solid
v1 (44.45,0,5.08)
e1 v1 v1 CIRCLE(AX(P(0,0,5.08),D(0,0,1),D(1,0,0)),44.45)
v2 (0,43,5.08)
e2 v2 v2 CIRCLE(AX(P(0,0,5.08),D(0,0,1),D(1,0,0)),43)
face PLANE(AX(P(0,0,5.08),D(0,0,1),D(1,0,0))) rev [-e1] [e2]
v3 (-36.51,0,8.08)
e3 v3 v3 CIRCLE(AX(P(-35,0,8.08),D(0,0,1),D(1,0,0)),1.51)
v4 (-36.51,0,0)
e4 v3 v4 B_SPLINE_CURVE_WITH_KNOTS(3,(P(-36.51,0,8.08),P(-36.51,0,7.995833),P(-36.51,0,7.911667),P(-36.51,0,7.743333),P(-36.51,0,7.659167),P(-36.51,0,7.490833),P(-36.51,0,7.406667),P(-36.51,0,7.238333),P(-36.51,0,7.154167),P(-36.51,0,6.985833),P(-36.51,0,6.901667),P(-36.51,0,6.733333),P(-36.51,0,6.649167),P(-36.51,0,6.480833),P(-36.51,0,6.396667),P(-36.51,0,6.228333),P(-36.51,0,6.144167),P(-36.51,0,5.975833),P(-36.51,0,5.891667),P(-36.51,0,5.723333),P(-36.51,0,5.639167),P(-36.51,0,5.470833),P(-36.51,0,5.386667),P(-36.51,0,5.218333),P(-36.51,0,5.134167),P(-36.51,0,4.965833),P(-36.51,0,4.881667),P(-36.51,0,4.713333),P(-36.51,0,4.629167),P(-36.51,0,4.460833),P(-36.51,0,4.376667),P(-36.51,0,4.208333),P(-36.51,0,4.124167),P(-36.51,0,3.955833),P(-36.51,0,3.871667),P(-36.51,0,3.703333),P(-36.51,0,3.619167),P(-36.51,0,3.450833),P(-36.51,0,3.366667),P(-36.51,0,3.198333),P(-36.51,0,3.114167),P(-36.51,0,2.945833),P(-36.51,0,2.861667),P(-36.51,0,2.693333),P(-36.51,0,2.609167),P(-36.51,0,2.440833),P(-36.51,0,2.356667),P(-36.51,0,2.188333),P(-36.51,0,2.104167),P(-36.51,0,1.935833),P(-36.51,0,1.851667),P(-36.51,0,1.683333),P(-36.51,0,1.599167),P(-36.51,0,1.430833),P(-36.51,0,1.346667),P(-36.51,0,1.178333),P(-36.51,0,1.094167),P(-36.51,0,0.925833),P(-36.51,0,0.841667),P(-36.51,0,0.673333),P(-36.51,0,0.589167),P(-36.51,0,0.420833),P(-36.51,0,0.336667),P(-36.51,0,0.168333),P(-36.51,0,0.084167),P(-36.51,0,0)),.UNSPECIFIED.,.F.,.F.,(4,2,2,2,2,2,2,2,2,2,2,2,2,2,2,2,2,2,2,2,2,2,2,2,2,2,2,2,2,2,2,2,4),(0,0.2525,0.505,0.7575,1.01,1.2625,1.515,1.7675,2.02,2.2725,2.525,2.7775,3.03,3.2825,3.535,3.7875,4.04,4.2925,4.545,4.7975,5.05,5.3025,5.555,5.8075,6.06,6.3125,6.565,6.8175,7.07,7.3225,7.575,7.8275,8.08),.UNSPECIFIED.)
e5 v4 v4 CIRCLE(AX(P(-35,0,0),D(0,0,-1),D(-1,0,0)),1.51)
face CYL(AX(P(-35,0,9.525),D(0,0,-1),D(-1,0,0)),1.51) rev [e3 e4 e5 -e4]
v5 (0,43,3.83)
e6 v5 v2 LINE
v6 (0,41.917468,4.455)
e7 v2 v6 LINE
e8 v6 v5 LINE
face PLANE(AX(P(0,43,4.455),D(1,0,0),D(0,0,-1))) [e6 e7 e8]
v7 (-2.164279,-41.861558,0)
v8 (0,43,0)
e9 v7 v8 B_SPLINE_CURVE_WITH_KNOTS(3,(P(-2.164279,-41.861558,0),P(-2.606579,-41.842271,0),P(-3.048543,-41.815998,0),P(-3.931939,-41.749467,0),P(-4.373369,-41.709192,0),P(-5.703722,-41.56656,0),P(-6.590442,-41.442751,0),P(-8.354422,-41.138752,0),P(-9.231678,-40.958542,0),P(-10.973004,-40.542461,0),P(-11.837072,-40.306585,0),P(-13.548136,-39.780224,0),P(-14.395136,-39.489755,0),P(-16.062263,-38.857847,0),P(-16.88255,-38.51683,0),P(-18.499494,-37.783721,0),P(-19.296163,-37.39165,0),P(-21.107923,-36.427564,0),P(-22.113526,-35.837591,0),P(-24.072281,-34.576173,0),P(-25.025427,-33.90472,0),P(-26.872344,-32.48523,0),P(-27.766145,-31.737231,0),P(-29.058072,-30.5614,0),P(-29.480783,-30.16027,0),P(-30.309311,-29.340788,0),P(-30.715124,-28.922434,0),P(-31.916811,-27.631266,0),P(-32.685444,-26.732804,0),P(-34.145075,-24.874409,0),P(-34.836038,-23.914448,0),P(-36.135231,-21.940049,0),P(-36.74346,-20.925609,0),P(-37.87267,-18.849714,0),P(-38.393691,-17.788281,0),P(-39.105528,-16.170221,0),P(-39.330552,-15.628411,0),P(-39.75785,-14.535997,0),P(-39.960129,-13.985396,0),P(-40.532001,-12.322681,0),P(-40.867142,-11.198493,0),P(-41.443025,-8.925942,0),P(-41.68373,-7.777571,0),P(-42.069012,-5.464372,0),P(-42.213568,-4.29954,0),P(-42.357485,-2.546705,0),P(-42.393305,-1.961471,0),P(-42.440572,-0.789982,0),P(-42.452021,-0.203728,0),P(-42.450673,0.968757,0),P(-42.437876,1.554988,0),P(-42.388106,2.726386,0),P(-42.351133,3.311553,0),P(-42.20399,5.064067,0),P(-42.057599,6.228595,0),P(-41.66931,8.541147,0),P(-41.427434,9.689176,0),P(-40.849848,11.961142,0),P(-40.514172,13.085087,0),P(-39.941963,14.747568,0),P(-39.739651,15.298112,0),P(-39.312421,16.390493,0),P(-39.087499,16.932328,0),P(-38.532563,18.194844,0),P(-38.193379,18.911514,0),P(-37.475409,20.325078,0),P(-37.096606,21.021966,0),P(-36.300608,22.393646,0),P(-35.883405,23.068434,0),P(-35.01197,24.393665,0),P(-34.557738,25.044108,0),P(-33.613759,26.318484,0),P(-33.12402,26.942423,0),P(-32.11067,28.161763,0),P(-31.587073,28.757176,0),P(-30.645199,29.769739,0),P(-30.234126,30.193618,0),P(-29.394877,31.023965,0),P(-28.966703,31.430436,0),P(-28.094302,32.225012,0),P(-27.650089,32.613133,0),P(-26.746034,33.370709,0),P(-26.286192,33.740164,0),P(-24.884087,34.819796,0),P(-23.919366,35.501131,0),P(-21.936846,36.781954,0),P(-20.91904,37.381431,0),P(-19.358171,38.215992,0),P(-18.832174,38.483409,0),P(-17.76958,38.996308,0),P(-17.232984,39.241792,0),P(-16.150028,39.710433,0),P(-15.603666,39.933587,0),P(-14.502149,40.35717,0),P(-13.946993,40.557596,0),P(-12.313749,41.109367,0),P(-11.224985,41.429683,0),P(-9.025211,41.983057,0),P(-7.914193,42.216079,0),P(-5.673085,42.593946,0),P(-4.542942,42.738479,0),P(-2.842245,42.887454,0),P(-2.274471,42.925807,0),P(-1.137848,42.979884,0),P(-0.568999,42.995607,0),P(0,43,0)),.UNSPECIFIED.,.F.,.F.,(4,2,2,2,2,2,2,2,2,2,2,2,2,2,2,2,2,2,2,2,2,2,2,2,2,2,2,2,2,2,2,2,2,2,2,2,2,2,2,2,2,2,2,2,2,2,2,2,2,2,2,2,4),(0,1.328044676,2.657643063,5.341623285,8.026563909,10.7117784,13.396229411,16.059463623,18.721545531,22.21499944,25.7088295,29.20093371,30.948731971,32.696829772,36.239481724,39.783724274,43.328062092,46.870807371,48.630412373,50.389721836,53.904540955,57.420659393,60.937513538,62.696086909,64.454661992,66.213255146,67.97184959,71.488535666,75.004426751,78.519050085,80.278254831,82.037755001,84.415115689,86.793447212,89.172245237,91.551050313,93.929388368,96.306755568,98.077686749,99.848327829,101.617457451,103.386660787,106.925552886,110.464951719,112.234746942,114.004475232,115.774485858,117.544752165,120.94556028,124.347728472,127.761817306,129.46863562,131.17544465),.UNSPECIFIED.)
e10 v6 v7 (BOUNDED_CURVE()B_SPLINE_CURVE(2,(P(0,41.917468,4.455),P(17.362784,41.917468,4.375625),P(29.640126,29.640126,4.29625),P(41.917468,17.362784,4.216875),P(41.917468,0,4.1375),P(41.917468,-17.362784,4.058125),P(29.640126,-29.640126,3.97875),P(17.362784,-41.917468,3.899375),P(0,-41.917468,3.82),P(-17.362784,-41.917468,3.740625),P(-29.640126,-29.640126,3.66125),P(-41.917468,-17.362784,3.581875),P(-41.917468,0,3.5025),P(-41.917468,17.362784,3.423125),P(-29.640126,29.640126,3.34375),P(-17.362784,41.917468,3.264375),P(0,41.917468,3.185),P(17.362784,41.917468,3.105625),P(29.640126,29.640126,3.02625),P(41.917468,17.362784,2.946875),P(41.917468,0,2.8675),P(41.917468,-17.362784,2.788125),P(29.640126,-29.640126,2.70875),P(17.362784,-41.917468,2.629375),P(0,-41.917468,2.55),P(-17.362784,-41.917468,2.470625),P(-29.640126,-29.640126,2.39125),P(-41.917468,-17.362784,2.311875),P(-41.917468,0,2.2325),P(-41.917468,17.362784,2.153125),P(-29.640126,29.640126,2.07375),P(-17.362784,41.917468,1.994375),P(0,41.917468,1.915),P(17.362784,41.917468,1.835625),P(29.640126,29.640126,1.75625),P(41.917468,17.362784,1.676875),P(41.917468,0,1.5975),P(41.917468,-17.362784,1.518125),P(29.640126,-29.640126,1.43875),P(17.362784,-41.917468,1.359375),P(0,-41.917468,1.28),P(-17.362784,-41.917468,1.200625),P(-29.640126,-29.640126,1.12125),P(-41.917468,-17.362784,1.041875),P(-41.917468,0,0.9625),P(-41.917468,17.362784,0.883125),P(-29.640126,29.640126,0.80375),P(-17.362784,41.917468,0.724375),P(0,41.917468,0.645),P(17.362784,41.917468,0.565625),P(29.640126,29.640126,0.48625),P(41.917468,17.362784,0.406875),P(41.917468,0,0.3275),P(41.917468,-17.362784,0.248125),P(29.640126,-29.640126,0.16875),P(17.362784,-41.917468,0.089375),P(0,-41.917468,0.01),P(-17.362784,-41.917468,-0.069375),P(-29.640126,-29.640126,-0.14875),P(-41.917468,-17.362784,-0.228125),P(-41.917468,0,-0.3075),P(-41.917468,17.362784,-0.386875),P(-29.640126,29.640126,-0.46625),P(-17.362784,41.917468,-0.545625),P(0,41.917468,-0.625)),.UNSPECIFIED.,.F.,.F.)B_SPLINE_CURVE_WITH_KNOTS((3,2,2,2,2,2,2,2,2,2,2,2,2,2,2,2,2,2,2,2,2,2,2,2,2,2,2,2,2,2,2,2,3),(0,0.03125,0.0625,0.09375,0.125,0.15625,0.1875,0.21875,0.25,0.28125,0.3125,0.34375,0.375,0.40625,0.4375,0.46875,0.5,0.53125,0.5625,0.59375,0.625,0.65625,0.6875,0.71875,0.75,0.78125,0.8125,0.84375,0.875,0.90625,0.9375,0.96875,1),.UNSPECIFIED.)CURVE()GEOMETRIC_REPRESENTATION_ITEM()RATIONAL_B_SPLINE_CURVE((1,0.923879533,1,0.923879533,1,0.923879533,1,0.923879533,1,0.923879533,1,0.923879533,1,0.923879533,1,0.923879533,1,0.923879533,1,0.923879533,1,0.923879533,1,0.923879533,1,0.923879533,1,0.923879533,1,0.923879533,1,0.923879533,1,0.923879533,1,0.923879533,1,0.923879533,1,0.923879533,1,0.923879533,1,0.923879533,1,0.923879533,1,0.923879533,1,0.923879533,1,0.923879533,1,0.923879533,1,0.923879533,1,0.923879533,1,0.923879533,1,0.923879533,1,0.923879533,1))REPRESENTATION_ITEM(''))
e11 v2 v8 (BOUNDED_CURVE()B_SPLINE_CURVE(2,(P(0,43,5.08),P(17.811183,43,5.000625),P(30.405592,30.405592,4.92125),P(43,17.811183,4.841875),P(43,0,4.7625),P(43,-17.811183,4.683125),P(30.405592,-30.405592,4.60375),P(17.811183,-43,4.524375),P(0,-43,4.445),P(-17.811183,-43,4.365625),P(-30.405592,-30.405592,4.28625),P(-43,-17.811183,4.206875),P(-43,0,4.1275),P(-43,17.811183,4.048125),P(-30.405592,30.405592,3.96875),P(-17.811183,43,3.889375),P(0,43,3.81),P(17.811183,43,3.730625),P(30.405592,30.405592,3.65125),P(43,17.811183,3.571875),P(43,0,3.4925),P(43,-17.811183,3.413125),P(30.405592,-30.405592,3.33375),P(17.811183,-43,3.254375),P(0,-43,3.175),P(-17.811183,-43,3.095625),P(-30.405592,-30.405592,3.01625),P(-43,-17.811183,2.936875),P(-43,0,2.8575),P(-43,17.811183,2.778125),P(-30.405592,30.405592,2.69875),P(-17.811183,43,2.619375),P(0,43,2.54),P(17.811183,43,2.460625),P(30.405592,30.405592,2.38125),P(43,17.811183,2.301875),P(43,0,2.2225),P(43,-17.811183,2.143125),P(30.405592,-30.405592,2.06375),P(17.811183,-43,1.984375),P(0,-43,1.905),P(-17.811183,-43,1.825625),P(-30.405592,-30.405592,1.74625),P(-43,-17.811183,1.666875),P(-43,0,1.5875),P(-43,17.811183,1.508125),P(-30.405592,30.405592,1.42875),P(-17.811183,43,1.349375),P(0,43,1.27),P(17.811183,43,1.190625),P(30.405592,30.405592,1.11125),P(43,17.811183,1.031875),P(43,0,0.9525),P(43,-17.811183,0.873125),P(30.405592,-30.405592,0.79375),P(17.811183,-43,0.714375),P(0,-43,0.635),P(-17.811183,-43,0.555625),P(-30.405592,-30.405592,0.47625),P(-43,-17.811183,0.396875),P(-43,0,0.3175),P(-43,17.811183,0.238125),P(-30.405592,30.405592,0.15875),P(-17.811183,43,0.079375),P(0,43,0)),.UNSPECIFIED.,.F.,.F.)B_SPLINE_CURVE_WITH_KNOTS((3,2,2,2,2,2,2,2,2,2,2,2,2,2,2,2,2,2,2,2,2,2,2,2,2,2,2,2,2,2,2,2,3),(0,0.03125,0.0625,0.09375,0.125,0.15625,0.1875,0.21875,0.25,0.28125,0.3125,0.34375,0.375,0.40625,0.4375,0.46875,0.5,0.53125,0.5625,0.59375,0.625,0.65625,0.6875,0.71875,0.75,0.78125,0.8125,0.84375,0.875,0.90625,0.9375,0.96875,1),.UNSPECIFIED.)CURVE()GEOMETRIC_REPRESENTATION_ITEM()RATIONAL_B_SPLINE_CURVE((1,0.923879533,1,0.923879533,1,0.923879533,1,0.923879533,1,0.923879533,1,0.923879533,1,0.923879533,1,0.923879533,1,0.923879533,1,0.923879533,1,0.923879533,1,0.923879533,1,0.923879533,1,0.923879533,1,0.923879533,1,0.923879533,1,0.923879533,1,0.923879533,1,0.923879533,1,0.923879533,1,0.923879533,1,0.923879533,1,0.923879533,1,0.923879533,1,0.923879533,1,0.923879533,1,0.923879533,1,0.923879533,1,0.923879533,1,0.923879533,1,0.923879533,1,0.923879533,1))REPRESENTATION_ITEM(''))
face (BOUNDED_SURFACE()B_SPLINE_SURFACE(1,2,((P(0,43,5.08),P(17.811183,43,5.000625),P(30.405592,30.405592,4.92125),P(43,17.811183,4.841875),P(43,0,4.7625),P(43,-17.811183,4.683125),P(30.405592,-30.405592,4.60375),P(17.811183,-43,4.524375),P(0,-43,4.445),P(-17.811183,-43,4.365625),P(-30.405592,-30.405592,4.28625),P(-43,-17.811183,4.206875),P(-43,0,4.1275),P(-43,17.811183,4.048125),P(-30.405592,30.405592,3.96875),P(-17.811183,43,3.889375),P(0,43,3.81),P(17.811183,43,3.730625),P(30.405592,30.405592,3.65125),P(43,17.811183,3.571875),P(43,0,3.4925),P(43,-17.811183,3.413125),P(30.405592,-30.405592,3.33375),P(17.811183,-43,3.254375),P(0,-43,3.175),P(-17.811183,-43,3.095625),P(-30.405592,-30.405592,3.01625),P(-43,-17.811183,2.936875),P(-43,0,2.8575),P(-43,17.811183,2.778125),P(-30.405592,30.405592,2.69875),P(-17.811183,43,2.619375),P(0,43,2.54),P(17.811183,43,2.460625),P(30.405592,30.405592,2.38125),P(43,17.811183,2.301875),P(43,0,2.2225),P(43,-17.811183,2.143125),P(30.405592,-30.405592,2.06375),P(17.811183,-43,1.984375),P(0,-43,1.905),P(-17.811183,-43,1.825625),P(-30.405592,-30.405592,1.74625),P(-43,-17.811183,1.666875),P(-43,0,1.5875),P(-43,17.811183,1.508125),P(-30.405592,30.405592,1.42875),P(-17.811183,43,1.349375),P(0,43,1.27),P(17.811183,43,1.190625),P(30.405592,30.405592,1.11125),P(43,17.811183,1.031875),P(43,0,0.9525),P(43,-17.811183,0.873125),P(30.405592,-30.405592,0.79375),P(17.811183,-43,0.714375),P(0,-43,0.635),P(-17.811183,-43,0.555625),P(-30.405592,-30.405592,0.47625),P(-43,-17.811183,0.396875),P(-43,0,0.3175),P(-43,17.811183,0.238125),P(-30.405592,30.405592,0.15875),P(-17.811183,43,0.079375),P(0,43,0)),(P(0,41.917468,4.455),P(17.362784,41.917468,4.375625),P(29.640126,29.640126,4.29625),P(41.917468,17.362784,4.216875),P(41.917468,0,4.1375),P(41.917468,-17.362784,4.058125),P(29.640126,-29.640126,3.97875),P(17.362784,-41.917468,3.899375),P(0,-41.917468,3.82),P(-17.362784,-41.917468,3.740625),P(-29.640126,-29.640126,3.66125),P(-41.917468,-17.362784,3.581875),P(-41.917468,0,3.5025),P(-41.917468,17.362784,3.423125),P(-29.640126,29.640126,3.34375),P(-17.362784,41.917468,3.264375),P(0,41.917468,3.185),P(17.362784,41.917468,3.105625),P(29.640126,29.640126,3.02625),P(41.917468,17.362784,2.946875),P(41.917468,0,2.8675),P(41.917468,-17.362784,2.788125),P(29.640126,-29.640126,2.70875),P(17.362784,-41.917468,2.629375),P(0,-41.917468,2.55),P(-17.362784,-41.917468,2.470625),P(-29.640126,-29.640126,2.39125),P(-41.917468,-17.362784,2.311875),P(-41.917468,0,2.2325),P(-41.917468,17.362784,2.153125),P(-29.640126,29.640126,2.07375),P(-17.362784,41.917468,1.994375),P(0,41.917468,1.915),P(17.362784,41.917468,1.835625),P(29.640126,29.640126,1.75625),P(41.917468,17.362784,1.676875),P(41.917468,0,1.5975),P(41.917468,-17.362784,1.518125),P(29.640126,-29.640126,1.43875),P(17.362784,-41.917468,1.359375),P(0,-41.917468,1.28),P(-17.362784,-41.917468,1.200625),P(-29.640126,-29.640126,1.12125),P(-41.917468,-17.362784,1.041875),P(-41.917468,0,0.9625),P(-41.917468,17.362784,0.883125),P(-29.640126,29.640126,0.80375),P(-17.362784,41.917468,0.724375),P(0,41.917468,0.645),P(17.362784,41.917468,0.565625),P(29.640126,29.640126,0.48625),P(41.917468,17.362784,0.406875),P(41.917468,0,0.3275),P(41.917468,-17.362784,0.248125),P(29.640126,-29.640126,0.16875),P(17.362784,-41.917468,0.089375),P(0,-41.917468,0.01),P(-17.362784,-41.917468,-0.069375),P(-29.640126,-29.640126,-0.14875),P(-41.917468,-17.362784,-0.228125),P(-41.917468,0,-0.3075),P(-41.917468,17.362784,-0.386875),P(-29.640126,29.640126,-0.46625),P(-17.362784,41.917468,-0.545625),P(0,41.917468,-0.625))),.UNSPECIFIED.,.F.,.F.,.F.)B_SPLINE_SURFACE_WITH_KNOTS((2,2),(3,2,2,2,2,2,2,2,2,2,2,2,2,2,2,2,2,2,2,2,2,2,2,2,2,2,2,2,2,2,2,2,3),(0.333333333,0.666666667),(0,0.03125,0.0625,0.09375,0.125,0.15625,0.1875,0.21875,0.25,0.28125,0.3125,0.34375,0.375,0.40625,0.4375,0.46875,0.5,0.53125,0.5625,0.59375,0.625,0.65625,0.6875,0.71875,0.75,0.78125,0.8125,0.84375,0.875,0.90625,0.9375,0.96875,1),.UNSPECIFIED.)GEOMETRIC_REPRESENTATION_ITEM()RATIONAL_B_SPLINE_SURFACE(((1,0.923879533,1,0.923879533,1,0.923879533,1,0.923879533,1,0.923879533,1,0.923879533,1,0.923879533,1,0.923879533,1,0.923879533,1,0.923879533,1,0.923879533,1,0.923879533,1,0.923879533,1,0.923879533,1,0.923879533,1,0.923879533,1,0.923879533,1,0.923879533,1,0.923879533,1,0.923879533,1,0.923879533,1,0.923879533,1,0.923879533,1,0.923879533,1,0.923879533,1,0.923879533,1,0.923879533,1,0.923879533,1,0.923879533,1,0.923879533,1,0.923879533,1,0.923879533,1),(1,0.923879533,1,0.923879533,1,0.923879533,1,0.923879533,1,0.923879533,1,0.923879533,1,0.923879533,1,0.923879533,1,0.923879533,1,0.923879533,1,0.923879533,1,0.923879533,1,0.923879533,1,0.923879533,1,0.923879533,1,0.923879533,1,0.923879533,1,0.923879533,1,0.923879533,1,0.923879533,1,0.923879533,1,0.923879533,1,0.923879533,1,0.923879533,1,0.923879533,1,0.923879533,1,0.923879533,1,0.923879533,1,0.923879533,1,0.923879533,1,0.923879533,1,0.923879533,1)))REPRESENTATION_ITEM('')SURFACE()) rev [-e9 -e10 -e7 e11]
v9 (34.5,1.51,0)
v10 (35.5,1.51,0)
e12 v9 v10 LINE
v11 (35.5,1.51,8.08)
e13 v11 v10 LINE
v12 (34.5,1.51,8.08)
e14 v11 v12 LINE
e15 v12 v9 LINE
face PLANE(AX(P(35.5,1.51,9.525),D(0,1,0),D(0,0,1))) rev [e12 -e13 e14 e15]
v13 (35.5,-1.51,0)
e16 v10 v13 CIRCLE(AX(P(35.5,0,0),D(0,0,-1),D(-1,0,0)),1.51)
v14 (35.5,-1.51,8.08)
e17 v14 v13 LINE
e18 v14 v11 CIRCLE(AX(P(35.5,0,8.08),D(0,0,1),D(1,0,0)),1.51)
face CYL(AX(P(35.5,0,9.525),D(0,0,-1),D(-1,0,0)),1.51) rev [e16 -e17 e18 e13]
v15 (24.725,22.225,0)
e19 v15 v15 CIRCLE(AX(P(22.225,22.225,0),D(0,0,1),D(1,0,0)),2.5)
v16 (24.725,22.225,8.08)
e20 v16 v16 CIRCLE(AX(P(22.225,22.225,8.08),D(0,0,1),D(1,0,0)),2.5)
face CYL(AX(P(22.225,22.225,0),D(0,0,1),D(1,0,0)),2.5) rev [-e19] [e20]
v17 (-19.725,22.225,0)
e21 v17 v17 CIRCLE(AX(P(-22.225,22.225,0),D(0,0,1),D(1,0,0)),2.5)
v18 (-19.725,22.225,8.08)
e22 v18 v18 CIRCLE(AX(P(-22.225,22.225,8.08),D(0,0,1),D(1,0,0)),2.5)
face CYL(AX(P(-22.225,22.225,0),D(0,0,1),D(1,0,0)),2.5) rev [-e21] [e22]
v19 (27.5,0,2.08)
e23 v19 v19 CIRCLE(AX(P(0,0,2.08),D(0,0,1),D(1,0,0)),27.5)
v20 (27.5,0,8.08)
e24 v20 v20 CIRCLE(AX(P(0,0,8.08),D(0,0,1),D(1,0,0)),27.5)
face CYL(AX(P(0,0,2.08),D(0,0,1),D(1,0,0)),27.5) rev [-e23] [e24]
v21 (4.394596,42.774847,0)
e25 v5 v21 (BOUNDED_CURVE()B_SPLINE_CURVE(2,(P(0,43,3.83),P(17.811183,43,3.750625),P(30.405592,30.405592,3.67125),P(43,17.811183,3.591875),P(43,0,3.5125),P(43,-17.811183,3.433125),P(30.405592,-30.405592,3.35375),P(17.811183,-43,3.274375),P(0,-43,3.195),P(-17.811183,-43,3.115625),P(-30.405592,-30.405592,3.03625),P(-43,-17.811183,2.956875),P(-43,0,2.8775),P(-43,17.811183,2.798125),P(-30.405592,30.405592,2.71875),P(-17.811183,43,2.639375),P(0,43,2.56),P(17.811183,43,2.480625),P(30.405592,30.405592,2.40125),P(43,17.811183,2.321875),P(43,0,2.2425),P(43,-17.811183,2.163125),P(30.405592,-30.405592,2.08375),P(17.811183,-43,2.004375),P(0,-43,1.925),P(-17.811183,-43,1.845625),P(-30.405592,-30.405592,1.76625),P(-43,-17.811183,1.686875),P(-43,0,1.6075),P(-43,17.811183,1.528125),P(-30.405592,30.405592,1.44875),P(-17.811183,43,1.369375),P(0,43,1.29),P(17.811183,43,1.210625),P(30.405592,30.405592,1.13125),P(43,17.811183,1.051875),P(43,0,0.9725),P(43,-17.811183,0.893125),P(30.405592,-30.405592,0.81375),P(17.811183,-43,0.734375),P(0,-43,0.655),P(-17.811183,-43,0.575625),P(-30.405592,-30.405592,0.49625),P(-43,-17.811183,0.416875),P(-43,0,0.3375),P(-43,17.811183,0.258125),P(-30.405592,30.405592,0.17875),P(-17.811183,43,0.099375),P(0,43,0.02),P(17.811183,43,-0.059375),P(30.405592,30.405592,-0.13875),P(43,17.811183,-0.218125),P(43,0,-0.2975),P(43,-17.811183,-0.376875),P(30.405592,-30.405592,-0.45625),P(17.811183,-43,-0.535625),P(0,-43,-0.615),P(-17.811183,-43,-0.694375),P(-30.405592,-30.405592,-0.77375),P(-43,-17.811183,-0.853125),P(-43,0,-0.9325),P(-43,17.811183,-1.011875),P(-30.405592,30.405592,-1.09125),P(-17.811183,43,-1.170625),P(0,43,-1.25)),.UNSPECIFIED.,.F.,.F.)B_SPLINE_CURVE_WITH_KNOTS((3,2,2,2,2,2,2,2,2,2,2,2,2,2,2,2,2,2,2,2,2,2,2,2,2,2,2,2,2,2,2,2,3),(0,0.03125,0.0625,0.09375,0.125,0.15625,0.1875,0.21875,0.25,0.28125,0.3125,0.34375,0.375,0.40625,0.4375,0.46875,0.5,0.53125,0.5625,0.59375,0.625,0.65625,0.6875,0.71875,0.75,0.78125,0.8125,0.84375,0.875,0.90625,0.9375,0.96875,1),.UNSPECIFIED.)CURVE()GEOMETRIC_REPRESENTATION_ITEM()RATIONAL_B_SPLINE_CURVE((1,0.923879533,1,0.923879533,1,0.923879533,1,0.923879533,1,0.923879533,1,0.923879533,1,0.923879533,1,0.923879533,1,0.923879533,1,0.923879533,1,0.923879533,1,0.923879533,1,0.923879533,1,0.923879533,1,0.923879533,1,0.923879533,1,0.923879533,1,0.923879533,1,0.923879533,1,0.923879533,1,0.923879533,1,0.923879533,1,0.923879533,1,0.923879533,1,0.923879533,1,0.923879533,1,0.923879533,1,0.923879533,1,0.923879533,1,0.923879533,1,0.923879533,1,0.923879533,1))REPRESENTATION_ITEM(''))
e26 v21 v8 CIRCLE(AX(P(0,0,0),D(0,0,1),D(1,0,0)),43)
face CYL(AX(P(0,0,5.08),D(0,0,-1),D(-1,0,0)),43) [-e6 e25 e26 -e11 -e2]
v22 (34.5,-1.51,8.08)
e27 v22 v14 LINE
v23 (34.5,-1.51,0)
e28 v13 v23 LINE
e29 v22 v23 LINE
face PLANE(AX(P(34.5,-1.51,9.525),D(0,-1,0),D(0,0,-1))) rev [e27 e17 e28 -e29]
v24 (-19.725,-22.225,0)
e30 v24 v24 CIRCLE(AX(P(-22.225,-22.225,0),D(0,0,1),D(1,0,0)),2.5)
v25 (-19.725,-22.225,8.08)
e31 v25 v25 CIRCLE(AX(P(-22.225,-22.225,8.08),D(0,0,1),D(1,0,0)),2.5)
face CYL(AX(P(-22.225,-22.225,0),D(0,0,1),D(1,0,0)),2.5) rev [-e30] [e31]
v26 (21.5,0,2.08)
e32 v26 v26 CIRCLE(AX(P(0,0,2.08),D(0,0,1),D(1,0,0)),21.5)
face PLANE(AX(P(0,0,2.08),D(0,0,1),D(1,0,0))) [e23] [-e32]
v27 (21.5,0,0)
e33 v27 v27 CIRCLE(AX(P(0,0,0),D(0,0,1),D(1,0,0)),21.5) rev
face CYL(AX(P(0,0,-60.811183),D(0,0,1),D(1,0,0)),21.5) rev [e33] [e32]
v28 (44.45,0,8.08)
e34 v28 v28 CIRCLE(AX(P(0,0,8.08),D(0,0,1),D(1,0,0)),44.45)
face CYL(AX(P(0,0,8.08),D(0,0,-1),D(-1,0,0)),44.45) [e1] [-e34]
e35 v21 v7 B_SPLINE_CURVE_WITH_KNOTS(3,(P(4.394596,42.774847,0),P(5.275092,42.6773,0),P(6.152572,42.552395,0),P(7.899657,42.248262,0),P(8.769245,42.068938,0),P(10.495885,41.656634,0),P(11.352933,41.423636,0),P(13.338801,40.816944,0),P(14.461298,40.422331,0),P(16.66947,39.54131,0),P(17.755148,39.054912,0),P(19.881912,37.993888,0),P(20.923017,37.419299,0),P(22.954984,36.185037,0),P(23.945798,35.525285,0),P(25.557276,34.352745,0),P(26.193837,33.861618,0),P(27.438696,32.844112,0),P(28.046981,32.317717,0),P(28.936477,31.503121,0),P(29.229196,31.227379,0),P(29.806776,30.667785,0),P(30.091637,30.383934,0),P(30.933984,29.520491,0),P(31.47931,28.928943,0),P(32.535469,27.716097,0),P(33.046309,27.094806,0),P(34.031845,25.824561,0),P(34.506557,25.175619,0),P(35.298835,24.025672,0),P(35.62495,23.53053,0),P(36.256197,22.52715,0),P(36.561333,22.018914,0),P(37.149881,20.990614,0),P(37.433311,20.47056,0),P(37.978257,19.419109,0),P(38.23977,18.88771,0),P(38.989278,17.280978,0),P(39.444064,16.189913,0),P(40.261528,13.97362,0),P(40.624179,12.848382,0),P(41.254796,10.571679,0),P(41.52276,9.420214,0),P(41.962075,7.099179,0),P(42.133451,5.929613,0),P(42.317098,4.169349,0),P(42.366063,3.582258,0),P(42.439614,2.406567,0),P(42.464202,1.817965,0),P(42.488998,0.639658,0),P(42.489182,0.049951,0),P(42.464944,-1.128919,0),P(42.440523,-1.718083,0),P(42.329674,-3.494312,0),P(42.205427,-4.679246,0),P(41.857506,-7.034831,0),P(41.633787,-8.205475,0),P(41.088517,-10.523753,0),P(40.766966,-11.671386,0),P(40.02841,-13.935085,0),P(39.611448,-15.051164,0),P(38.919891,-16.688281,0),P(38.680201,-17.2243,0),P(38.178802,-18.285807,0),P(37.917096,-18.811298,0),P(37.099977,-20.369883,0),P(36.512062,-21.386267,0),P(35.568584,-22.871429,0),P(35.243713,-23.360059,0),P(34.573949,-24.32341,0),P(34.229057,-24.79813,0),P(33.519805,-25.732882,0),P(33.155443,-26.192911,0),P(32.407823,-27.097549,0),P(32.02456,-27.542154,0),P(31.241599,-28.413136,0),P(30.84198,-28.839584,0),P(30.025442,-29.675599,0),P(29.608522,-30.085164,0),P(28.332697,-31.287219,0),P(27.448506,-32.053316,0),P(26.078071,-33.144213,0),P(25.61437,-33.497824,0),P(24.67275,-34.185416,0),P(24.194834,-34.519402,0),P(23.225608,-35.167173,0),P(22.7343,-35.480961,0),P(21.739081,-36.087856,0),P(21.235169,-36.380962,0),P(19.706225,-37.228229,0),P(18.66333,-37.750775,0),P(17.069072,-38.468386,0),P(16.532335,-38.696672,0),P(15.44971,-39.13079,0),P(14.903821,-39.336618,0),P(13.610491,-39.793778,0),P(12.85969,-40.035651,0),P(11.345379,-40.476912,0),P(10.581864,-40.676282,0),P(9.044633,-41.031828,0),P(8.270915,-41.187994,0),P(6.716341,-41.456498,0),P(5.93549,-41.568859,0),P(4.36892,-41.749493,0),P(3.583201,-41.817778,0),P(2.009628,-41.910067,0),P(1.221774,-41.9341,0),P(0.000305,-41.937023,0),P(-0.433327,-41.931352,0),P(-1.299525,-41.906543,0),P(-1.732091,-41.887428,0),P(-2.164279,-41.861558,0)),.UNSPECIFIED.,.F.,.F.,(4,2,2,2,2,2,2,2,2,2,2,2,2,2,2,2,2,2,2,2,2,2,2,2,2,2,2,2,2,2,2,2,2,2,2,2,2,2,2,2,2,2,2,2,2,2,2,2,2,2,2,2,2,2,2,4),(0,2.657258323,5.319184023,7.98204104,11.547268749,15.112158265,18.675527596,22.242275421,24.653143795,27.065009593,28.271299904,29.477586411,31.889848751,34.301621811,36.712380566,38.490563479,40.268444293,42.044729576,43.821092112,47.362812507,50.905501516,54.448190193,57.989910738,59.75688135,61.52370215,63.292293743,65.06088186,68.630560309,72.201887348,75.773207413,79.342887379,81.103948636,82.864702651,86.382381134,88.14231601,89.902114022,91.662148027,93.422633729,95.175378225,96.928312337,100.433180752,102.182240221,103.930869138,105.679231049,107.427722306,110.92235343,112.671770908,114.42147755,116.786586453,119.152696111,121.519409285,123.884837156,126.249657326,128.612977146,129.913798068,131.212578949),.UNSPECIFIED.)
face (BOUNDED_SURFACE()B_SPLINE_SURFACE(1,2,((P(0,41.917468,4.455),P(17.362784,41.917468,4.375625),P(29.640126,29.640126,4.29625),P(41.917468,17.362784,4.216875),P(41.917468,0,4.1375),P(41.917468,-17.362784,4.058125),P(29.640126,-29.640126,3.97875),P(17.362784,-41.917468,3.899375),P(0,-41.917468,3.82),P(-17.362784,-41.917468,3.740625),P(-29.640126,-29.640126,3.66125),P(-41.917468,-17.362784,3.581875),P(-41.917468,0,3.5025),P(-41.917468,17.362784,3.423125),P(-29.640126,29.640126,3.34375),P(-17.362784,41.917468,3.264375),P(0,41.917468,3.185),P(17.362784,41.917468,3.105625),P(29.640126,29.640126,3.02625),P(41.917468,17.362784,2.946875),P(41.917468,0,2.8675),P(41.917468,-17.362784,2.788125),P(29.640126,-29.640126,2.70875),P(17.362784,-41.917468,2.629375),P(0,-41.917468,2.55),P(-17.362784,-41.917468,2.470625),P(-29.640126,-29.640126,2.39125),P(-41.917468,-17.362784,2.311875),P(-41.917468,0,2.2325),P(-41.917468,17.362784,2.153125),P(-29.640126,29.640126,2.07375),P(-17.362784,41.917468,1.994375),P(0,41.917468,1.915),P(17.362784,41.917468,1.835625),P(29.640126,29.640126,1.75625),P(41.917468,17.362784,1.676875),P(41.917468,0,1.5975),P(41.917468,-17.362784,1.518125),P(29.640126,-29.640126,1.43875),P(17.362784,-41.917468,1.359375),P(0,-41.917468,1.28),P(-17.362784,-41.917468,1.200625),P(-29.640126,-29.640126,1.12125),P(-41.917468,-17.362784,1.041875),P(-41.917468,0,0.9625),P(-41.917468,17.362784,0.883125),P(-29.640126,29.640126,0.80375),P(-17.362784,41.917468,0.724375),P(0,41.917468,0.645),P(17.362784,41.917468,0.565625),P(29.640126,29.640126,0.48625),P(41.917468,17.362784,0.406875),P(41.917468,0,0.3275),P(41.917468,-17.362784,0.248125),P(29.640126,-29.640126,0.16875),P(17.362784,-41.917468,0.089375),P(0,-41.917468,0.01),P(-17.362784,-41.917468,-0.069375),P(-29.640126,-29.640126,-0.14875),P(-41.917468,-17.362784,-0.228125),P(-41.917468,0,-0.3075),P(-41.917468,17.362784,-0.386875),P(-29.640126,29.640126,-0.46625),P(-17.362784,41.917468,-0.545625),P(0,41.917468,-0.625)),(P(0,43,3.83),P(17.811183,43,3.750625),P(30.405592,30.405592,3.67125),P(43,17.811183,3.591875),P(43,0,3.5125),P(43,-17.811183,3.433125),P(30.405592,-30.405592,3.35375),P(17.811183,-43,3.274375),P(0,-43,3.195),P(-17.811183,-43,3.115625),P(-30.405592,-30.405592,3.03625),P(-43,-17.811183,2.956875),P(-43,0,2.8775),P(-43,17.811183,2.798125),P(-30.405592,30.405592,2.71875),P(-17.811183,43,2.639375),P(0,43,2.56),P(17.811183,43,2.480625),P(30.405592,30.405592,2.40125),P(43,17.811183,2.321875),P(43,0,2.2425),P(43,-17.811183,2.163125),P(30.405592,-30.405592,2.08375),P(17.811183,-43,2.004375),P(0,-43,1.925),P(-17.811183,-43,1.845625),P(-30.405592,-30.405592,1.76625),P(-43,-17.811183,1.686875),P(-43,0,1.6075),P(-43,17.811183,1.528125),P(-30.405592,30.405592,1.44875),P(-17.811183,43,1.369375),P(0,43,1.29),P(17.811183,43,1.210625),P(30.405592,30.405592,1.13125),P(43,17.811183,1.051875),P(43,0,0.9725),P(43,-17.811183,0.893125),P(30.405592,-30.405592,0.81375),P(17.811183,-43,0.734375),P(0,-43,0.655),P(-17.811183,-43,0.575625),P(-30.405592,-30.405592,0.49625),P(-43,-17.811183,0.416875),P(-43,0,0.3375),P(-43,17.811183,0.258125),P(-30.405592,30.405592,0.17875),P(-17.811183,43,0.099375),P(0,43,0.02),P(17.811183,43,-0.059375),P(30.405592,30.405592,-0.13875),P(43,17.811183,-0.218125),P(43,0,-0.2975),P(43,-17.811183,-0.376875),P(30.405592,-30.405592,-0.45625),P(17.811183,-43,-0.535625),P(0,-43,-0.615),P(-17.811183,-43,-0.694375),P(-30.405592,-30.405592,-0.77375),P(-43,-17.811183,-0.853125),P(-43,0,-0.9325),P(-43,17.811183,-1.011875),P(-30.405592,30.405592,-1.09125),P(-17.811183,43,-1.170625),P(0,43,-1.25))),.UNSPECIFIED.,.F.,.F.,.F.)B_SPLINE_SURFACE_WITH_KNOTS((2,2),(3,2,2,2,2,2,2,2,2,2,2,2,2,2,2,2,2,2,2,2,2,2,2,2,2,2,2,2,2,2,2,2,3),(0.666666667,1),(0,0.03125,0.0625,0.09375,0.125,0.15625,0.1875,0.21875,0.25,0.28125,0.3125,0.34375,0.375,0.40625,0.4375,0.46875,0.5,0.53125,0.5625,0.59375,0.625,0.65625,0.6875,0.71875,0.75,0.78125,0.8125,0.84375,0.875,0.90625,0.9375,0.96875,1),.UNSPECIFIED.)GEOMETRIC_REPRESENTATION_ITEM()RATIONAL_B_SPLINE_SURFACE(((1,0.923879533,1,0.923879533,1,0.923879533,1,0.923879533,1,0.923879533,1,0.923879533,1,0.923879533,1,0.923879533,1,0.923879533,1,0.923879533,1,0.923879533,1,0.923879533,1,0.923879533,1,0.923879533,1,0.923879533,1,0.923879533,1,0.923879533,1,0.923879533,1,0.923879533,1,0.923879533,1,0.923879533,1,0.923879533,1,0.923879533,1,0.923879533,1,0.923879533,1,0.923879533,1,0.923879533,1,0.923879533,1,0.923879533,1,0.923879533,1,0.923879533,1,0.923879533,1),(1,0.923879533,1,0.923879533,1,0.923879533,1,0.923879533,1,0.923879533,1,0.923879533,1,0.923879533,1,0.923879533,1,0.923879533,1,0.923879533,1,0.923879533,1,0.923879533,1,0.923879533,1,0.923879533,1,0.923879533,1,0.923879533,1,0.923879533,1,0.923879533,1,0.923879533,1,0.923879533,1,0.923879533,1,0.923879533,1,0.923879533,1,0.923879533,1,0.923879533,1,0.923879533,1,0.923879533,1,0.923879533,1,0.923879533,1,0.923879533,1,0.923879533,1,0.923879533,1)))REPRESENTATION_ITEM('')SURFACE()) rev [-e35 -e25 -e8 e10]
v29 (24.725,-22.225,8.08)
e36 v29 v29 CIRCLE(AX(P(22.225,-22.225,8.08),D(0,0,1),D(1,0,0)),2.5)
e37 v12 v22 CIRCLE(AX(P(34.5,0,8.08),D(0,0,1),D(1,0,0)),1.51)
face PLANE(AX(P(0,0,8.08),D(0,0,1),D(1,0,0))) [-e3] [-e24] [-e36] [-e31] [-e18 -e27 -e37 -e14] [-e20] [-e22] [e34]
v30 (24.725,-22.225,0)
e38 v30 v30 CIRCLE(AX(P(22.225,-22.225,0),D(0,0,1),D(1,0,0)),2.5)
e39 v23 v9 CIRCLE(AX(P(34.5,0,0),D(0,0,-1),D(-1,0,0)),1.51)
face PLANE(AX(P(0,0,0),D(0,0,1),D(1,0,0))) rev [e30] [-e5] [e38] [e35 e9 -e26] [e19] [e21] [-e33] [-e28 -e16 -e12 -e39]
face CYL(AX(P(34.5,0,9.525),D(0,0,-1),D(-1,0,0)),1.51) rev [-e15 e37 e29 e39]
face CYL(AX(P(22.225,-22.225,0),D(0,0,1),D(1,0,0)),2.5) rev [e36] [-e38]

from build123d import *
from build123d.topology import SkipClean

# Parameters (mm, degrees)
SKETCH1_R          = 43
EXTRUDE1_DEPTH     = 5.08
SKETCH2_R          = 44.45
EXTRUDE2_DEPTH     = 3
SKETCH5_R          = 2.5
EXTRUDE4_DEPTH     = 64.378950764
CUT_SWEEP1_PITCH   = 1.27
SKETCH15_R         = 1.51
EXTRUDE10_DEPTH    = 9.525
SKETCH16_R         = 27.5
CUT_EXTRUDE1_DEPTH = 6
SKETCH17_R         = 21.5
CUT_EXTRUDE2_DEPTH = 2.08


with BuildPart() as part:
    # Sketch1 → Extrude1 (new body)
    with BuildSketch(Plane.XY):
        Circle(SKETCH1_R)
    extrude(amount=EXTRUDE1_DEPTH)

    # Sketch2 → Extrude2 (add)
    with BuildSketch(Plane.XY.offset(5.08)):
        Circle(SKETCH2_R)
    extrude(amount=EXTRUDE2_DEPTH)

    # Sketch5 → Extrude4 (cut, through all)
    with BuildSketch(Plane.XY.offset(8.08)):
        with Locations((-22.225, 22.225)):
            Circle(SKETCH5_R)
        with Locations((22.225, 22.225)):
            Circle(SKETCH5_R)
        with Locations((22.225, -22.225)):
            Circle(SKETCH5_R)
        with Locations((-22.225, -22.225)):
            Circle(SKETCH5_R)
    extrude(amount=-EXTRUDE4_DEPTH, mode=Mode.SUBTRACT)

    # Cut-Sweep1: the profile of Sketch10 profile screwed along a right-hand helix of 4 turns, 8 arcs to a turn; built about Z, then put on its axis
    with SkipClean():  # the faces are left unmerged after this step: merging them gives an invalid solid
        cut_sweep1_z = Axis((0, 0, 0), (0, 0, 1))
        cut_sweep1_corners = [(43.0003, 0, -0.625173205), (41.917468245, 0, 0), (43.0003, 0, 0.625173205)]
        with BuildLine(mode=Mode.PRIVATE) as cut_sweep1_profile:
            Line(cut_sweep1_corners[0], cut_sweep1_corners[1])
            Line(cut_sweep1_corners[1], cut_sweep1_corners[2])
            Line(cut_sweep1_corners[2], cut_sweep1_corners[0])
        cut_sweep1_cap = Face(cut_sweep1_profile.wire())
        cut_sweep1_turn_angles = [0, 22.5, 45, 67.5, 90, 112.5, 135, 157.5, 180, 202.5, 225, 247.5, 270, 292.5, 315, 337.5, 360]
        cut_sweep1_turn_weights = [1, 0.9238795325112867, 1, 0.9238795325112867, 1, 0.9238795325112867, 1, 0.9238795325112867, 1, 0.9238795325112867, 1, 0.9238795325112867, 1, 0.9238795325112867, 1, 0.9238795325112867, 1]
        cut_sweep1_turn_rails = [Edge.make_bspline([Vector(p[0], p[1], 0).rotate(cut_sweep1_z, cut_sweep1_turn_angles[k]) / cut_sweep1_turn_weights[k] + Vector(0, 0, p[2] + CUT_SWEEP1_PITCH * cut_sweep1_turn_angles[k] / 360) for k in range(17)], [0, 0, 0, 1, 1, 2, 2, 3, 3, 4, 4, 5, 5, 6, 6, 7, 7, 8, 8, 8], 2, cut_sweep1_turn_weights) for p in cut_sweep1_corners]
        cut_sweep1_turn_sides = [Face.make_surface_from_curves(cut_sweep1_turn_rails[p[0]], cut_sweep1_turn_rails[p[1]]) for p in [(0, 1), (1, 2), (2, 0)]]
        cut_sweep1 = Plane(origin=(0, 0, 4.455), x_dir=(0, 1, 0), z_dir=(0, 0, -1)) * Solid(Shell([*[p.moved(Location((0, 0, CUT_SWEEP1_PITCH * i))) for i in range(4) for p in cut_sweep1_turn_sides], cut_sweep1_cap, cut_sweep1_cap.rotate(cut_sweep1_z, 1440).moved(Location((0, 0, CUT_SWEEP1_PITCH * 1440 / 360)))]))
        add(cut_sweep1, mode=Mode.SUBTRACT)

    # Sketch15 → Extrude10 (cut)
    with SkipClean():  # the faces are left unmerged after this step: merging them gives an invalid solid
        with BuildSketch(Plane(origin=(0, 0, 0), x_dir=(-1, 0, 0), z_dir=(0, 0, -1))):
            with Locations((35, 0)):
                Circle(SKETCH15_R)
            with BuildLine():
                Line((-35.5, 1.51), (-34.5, 1.51))
                ThreePointArc((-34.5, 1.51), (-32.99, 0), (-34.5, -1.51))
                Line((-34.5, -1.51), (-35.5, -1.51))
                ThreePointArc((-35.5, -1.51), (-37.01, 0), (-35.5, 1.51))
            make_face()
        extrude(amount=-EXTRUDE10_DEPTH, mode=Mode.SUBTRACT)

    # Sketch16 → Cut-Extrude1 (cut)
    with SkipClean():  # the faces are left unmerged after this step: merging them gives an invalid solid
        with BuildSketch(Plane.XY.offset(8.08)):
            Circle(SKETCH16_R)
        extrude(amount=-CUT_EXTRUDE1_DEPTH, mode=Mode.SUBTRACT)

    # Sketch17 → Cut-Extrude2 (cut)
    with SkipClean():  # the faces are left unmerged after this step: merging them gives an invalid solid
        with BuildSketch(Plane.XY.offset(2.08)):
            Circle(SKETCH17_R)
        extrude(amount=-CUT_EXTRUDE2_DEPTH, mode=Mode.SUBTRACT)


solid = part.part
